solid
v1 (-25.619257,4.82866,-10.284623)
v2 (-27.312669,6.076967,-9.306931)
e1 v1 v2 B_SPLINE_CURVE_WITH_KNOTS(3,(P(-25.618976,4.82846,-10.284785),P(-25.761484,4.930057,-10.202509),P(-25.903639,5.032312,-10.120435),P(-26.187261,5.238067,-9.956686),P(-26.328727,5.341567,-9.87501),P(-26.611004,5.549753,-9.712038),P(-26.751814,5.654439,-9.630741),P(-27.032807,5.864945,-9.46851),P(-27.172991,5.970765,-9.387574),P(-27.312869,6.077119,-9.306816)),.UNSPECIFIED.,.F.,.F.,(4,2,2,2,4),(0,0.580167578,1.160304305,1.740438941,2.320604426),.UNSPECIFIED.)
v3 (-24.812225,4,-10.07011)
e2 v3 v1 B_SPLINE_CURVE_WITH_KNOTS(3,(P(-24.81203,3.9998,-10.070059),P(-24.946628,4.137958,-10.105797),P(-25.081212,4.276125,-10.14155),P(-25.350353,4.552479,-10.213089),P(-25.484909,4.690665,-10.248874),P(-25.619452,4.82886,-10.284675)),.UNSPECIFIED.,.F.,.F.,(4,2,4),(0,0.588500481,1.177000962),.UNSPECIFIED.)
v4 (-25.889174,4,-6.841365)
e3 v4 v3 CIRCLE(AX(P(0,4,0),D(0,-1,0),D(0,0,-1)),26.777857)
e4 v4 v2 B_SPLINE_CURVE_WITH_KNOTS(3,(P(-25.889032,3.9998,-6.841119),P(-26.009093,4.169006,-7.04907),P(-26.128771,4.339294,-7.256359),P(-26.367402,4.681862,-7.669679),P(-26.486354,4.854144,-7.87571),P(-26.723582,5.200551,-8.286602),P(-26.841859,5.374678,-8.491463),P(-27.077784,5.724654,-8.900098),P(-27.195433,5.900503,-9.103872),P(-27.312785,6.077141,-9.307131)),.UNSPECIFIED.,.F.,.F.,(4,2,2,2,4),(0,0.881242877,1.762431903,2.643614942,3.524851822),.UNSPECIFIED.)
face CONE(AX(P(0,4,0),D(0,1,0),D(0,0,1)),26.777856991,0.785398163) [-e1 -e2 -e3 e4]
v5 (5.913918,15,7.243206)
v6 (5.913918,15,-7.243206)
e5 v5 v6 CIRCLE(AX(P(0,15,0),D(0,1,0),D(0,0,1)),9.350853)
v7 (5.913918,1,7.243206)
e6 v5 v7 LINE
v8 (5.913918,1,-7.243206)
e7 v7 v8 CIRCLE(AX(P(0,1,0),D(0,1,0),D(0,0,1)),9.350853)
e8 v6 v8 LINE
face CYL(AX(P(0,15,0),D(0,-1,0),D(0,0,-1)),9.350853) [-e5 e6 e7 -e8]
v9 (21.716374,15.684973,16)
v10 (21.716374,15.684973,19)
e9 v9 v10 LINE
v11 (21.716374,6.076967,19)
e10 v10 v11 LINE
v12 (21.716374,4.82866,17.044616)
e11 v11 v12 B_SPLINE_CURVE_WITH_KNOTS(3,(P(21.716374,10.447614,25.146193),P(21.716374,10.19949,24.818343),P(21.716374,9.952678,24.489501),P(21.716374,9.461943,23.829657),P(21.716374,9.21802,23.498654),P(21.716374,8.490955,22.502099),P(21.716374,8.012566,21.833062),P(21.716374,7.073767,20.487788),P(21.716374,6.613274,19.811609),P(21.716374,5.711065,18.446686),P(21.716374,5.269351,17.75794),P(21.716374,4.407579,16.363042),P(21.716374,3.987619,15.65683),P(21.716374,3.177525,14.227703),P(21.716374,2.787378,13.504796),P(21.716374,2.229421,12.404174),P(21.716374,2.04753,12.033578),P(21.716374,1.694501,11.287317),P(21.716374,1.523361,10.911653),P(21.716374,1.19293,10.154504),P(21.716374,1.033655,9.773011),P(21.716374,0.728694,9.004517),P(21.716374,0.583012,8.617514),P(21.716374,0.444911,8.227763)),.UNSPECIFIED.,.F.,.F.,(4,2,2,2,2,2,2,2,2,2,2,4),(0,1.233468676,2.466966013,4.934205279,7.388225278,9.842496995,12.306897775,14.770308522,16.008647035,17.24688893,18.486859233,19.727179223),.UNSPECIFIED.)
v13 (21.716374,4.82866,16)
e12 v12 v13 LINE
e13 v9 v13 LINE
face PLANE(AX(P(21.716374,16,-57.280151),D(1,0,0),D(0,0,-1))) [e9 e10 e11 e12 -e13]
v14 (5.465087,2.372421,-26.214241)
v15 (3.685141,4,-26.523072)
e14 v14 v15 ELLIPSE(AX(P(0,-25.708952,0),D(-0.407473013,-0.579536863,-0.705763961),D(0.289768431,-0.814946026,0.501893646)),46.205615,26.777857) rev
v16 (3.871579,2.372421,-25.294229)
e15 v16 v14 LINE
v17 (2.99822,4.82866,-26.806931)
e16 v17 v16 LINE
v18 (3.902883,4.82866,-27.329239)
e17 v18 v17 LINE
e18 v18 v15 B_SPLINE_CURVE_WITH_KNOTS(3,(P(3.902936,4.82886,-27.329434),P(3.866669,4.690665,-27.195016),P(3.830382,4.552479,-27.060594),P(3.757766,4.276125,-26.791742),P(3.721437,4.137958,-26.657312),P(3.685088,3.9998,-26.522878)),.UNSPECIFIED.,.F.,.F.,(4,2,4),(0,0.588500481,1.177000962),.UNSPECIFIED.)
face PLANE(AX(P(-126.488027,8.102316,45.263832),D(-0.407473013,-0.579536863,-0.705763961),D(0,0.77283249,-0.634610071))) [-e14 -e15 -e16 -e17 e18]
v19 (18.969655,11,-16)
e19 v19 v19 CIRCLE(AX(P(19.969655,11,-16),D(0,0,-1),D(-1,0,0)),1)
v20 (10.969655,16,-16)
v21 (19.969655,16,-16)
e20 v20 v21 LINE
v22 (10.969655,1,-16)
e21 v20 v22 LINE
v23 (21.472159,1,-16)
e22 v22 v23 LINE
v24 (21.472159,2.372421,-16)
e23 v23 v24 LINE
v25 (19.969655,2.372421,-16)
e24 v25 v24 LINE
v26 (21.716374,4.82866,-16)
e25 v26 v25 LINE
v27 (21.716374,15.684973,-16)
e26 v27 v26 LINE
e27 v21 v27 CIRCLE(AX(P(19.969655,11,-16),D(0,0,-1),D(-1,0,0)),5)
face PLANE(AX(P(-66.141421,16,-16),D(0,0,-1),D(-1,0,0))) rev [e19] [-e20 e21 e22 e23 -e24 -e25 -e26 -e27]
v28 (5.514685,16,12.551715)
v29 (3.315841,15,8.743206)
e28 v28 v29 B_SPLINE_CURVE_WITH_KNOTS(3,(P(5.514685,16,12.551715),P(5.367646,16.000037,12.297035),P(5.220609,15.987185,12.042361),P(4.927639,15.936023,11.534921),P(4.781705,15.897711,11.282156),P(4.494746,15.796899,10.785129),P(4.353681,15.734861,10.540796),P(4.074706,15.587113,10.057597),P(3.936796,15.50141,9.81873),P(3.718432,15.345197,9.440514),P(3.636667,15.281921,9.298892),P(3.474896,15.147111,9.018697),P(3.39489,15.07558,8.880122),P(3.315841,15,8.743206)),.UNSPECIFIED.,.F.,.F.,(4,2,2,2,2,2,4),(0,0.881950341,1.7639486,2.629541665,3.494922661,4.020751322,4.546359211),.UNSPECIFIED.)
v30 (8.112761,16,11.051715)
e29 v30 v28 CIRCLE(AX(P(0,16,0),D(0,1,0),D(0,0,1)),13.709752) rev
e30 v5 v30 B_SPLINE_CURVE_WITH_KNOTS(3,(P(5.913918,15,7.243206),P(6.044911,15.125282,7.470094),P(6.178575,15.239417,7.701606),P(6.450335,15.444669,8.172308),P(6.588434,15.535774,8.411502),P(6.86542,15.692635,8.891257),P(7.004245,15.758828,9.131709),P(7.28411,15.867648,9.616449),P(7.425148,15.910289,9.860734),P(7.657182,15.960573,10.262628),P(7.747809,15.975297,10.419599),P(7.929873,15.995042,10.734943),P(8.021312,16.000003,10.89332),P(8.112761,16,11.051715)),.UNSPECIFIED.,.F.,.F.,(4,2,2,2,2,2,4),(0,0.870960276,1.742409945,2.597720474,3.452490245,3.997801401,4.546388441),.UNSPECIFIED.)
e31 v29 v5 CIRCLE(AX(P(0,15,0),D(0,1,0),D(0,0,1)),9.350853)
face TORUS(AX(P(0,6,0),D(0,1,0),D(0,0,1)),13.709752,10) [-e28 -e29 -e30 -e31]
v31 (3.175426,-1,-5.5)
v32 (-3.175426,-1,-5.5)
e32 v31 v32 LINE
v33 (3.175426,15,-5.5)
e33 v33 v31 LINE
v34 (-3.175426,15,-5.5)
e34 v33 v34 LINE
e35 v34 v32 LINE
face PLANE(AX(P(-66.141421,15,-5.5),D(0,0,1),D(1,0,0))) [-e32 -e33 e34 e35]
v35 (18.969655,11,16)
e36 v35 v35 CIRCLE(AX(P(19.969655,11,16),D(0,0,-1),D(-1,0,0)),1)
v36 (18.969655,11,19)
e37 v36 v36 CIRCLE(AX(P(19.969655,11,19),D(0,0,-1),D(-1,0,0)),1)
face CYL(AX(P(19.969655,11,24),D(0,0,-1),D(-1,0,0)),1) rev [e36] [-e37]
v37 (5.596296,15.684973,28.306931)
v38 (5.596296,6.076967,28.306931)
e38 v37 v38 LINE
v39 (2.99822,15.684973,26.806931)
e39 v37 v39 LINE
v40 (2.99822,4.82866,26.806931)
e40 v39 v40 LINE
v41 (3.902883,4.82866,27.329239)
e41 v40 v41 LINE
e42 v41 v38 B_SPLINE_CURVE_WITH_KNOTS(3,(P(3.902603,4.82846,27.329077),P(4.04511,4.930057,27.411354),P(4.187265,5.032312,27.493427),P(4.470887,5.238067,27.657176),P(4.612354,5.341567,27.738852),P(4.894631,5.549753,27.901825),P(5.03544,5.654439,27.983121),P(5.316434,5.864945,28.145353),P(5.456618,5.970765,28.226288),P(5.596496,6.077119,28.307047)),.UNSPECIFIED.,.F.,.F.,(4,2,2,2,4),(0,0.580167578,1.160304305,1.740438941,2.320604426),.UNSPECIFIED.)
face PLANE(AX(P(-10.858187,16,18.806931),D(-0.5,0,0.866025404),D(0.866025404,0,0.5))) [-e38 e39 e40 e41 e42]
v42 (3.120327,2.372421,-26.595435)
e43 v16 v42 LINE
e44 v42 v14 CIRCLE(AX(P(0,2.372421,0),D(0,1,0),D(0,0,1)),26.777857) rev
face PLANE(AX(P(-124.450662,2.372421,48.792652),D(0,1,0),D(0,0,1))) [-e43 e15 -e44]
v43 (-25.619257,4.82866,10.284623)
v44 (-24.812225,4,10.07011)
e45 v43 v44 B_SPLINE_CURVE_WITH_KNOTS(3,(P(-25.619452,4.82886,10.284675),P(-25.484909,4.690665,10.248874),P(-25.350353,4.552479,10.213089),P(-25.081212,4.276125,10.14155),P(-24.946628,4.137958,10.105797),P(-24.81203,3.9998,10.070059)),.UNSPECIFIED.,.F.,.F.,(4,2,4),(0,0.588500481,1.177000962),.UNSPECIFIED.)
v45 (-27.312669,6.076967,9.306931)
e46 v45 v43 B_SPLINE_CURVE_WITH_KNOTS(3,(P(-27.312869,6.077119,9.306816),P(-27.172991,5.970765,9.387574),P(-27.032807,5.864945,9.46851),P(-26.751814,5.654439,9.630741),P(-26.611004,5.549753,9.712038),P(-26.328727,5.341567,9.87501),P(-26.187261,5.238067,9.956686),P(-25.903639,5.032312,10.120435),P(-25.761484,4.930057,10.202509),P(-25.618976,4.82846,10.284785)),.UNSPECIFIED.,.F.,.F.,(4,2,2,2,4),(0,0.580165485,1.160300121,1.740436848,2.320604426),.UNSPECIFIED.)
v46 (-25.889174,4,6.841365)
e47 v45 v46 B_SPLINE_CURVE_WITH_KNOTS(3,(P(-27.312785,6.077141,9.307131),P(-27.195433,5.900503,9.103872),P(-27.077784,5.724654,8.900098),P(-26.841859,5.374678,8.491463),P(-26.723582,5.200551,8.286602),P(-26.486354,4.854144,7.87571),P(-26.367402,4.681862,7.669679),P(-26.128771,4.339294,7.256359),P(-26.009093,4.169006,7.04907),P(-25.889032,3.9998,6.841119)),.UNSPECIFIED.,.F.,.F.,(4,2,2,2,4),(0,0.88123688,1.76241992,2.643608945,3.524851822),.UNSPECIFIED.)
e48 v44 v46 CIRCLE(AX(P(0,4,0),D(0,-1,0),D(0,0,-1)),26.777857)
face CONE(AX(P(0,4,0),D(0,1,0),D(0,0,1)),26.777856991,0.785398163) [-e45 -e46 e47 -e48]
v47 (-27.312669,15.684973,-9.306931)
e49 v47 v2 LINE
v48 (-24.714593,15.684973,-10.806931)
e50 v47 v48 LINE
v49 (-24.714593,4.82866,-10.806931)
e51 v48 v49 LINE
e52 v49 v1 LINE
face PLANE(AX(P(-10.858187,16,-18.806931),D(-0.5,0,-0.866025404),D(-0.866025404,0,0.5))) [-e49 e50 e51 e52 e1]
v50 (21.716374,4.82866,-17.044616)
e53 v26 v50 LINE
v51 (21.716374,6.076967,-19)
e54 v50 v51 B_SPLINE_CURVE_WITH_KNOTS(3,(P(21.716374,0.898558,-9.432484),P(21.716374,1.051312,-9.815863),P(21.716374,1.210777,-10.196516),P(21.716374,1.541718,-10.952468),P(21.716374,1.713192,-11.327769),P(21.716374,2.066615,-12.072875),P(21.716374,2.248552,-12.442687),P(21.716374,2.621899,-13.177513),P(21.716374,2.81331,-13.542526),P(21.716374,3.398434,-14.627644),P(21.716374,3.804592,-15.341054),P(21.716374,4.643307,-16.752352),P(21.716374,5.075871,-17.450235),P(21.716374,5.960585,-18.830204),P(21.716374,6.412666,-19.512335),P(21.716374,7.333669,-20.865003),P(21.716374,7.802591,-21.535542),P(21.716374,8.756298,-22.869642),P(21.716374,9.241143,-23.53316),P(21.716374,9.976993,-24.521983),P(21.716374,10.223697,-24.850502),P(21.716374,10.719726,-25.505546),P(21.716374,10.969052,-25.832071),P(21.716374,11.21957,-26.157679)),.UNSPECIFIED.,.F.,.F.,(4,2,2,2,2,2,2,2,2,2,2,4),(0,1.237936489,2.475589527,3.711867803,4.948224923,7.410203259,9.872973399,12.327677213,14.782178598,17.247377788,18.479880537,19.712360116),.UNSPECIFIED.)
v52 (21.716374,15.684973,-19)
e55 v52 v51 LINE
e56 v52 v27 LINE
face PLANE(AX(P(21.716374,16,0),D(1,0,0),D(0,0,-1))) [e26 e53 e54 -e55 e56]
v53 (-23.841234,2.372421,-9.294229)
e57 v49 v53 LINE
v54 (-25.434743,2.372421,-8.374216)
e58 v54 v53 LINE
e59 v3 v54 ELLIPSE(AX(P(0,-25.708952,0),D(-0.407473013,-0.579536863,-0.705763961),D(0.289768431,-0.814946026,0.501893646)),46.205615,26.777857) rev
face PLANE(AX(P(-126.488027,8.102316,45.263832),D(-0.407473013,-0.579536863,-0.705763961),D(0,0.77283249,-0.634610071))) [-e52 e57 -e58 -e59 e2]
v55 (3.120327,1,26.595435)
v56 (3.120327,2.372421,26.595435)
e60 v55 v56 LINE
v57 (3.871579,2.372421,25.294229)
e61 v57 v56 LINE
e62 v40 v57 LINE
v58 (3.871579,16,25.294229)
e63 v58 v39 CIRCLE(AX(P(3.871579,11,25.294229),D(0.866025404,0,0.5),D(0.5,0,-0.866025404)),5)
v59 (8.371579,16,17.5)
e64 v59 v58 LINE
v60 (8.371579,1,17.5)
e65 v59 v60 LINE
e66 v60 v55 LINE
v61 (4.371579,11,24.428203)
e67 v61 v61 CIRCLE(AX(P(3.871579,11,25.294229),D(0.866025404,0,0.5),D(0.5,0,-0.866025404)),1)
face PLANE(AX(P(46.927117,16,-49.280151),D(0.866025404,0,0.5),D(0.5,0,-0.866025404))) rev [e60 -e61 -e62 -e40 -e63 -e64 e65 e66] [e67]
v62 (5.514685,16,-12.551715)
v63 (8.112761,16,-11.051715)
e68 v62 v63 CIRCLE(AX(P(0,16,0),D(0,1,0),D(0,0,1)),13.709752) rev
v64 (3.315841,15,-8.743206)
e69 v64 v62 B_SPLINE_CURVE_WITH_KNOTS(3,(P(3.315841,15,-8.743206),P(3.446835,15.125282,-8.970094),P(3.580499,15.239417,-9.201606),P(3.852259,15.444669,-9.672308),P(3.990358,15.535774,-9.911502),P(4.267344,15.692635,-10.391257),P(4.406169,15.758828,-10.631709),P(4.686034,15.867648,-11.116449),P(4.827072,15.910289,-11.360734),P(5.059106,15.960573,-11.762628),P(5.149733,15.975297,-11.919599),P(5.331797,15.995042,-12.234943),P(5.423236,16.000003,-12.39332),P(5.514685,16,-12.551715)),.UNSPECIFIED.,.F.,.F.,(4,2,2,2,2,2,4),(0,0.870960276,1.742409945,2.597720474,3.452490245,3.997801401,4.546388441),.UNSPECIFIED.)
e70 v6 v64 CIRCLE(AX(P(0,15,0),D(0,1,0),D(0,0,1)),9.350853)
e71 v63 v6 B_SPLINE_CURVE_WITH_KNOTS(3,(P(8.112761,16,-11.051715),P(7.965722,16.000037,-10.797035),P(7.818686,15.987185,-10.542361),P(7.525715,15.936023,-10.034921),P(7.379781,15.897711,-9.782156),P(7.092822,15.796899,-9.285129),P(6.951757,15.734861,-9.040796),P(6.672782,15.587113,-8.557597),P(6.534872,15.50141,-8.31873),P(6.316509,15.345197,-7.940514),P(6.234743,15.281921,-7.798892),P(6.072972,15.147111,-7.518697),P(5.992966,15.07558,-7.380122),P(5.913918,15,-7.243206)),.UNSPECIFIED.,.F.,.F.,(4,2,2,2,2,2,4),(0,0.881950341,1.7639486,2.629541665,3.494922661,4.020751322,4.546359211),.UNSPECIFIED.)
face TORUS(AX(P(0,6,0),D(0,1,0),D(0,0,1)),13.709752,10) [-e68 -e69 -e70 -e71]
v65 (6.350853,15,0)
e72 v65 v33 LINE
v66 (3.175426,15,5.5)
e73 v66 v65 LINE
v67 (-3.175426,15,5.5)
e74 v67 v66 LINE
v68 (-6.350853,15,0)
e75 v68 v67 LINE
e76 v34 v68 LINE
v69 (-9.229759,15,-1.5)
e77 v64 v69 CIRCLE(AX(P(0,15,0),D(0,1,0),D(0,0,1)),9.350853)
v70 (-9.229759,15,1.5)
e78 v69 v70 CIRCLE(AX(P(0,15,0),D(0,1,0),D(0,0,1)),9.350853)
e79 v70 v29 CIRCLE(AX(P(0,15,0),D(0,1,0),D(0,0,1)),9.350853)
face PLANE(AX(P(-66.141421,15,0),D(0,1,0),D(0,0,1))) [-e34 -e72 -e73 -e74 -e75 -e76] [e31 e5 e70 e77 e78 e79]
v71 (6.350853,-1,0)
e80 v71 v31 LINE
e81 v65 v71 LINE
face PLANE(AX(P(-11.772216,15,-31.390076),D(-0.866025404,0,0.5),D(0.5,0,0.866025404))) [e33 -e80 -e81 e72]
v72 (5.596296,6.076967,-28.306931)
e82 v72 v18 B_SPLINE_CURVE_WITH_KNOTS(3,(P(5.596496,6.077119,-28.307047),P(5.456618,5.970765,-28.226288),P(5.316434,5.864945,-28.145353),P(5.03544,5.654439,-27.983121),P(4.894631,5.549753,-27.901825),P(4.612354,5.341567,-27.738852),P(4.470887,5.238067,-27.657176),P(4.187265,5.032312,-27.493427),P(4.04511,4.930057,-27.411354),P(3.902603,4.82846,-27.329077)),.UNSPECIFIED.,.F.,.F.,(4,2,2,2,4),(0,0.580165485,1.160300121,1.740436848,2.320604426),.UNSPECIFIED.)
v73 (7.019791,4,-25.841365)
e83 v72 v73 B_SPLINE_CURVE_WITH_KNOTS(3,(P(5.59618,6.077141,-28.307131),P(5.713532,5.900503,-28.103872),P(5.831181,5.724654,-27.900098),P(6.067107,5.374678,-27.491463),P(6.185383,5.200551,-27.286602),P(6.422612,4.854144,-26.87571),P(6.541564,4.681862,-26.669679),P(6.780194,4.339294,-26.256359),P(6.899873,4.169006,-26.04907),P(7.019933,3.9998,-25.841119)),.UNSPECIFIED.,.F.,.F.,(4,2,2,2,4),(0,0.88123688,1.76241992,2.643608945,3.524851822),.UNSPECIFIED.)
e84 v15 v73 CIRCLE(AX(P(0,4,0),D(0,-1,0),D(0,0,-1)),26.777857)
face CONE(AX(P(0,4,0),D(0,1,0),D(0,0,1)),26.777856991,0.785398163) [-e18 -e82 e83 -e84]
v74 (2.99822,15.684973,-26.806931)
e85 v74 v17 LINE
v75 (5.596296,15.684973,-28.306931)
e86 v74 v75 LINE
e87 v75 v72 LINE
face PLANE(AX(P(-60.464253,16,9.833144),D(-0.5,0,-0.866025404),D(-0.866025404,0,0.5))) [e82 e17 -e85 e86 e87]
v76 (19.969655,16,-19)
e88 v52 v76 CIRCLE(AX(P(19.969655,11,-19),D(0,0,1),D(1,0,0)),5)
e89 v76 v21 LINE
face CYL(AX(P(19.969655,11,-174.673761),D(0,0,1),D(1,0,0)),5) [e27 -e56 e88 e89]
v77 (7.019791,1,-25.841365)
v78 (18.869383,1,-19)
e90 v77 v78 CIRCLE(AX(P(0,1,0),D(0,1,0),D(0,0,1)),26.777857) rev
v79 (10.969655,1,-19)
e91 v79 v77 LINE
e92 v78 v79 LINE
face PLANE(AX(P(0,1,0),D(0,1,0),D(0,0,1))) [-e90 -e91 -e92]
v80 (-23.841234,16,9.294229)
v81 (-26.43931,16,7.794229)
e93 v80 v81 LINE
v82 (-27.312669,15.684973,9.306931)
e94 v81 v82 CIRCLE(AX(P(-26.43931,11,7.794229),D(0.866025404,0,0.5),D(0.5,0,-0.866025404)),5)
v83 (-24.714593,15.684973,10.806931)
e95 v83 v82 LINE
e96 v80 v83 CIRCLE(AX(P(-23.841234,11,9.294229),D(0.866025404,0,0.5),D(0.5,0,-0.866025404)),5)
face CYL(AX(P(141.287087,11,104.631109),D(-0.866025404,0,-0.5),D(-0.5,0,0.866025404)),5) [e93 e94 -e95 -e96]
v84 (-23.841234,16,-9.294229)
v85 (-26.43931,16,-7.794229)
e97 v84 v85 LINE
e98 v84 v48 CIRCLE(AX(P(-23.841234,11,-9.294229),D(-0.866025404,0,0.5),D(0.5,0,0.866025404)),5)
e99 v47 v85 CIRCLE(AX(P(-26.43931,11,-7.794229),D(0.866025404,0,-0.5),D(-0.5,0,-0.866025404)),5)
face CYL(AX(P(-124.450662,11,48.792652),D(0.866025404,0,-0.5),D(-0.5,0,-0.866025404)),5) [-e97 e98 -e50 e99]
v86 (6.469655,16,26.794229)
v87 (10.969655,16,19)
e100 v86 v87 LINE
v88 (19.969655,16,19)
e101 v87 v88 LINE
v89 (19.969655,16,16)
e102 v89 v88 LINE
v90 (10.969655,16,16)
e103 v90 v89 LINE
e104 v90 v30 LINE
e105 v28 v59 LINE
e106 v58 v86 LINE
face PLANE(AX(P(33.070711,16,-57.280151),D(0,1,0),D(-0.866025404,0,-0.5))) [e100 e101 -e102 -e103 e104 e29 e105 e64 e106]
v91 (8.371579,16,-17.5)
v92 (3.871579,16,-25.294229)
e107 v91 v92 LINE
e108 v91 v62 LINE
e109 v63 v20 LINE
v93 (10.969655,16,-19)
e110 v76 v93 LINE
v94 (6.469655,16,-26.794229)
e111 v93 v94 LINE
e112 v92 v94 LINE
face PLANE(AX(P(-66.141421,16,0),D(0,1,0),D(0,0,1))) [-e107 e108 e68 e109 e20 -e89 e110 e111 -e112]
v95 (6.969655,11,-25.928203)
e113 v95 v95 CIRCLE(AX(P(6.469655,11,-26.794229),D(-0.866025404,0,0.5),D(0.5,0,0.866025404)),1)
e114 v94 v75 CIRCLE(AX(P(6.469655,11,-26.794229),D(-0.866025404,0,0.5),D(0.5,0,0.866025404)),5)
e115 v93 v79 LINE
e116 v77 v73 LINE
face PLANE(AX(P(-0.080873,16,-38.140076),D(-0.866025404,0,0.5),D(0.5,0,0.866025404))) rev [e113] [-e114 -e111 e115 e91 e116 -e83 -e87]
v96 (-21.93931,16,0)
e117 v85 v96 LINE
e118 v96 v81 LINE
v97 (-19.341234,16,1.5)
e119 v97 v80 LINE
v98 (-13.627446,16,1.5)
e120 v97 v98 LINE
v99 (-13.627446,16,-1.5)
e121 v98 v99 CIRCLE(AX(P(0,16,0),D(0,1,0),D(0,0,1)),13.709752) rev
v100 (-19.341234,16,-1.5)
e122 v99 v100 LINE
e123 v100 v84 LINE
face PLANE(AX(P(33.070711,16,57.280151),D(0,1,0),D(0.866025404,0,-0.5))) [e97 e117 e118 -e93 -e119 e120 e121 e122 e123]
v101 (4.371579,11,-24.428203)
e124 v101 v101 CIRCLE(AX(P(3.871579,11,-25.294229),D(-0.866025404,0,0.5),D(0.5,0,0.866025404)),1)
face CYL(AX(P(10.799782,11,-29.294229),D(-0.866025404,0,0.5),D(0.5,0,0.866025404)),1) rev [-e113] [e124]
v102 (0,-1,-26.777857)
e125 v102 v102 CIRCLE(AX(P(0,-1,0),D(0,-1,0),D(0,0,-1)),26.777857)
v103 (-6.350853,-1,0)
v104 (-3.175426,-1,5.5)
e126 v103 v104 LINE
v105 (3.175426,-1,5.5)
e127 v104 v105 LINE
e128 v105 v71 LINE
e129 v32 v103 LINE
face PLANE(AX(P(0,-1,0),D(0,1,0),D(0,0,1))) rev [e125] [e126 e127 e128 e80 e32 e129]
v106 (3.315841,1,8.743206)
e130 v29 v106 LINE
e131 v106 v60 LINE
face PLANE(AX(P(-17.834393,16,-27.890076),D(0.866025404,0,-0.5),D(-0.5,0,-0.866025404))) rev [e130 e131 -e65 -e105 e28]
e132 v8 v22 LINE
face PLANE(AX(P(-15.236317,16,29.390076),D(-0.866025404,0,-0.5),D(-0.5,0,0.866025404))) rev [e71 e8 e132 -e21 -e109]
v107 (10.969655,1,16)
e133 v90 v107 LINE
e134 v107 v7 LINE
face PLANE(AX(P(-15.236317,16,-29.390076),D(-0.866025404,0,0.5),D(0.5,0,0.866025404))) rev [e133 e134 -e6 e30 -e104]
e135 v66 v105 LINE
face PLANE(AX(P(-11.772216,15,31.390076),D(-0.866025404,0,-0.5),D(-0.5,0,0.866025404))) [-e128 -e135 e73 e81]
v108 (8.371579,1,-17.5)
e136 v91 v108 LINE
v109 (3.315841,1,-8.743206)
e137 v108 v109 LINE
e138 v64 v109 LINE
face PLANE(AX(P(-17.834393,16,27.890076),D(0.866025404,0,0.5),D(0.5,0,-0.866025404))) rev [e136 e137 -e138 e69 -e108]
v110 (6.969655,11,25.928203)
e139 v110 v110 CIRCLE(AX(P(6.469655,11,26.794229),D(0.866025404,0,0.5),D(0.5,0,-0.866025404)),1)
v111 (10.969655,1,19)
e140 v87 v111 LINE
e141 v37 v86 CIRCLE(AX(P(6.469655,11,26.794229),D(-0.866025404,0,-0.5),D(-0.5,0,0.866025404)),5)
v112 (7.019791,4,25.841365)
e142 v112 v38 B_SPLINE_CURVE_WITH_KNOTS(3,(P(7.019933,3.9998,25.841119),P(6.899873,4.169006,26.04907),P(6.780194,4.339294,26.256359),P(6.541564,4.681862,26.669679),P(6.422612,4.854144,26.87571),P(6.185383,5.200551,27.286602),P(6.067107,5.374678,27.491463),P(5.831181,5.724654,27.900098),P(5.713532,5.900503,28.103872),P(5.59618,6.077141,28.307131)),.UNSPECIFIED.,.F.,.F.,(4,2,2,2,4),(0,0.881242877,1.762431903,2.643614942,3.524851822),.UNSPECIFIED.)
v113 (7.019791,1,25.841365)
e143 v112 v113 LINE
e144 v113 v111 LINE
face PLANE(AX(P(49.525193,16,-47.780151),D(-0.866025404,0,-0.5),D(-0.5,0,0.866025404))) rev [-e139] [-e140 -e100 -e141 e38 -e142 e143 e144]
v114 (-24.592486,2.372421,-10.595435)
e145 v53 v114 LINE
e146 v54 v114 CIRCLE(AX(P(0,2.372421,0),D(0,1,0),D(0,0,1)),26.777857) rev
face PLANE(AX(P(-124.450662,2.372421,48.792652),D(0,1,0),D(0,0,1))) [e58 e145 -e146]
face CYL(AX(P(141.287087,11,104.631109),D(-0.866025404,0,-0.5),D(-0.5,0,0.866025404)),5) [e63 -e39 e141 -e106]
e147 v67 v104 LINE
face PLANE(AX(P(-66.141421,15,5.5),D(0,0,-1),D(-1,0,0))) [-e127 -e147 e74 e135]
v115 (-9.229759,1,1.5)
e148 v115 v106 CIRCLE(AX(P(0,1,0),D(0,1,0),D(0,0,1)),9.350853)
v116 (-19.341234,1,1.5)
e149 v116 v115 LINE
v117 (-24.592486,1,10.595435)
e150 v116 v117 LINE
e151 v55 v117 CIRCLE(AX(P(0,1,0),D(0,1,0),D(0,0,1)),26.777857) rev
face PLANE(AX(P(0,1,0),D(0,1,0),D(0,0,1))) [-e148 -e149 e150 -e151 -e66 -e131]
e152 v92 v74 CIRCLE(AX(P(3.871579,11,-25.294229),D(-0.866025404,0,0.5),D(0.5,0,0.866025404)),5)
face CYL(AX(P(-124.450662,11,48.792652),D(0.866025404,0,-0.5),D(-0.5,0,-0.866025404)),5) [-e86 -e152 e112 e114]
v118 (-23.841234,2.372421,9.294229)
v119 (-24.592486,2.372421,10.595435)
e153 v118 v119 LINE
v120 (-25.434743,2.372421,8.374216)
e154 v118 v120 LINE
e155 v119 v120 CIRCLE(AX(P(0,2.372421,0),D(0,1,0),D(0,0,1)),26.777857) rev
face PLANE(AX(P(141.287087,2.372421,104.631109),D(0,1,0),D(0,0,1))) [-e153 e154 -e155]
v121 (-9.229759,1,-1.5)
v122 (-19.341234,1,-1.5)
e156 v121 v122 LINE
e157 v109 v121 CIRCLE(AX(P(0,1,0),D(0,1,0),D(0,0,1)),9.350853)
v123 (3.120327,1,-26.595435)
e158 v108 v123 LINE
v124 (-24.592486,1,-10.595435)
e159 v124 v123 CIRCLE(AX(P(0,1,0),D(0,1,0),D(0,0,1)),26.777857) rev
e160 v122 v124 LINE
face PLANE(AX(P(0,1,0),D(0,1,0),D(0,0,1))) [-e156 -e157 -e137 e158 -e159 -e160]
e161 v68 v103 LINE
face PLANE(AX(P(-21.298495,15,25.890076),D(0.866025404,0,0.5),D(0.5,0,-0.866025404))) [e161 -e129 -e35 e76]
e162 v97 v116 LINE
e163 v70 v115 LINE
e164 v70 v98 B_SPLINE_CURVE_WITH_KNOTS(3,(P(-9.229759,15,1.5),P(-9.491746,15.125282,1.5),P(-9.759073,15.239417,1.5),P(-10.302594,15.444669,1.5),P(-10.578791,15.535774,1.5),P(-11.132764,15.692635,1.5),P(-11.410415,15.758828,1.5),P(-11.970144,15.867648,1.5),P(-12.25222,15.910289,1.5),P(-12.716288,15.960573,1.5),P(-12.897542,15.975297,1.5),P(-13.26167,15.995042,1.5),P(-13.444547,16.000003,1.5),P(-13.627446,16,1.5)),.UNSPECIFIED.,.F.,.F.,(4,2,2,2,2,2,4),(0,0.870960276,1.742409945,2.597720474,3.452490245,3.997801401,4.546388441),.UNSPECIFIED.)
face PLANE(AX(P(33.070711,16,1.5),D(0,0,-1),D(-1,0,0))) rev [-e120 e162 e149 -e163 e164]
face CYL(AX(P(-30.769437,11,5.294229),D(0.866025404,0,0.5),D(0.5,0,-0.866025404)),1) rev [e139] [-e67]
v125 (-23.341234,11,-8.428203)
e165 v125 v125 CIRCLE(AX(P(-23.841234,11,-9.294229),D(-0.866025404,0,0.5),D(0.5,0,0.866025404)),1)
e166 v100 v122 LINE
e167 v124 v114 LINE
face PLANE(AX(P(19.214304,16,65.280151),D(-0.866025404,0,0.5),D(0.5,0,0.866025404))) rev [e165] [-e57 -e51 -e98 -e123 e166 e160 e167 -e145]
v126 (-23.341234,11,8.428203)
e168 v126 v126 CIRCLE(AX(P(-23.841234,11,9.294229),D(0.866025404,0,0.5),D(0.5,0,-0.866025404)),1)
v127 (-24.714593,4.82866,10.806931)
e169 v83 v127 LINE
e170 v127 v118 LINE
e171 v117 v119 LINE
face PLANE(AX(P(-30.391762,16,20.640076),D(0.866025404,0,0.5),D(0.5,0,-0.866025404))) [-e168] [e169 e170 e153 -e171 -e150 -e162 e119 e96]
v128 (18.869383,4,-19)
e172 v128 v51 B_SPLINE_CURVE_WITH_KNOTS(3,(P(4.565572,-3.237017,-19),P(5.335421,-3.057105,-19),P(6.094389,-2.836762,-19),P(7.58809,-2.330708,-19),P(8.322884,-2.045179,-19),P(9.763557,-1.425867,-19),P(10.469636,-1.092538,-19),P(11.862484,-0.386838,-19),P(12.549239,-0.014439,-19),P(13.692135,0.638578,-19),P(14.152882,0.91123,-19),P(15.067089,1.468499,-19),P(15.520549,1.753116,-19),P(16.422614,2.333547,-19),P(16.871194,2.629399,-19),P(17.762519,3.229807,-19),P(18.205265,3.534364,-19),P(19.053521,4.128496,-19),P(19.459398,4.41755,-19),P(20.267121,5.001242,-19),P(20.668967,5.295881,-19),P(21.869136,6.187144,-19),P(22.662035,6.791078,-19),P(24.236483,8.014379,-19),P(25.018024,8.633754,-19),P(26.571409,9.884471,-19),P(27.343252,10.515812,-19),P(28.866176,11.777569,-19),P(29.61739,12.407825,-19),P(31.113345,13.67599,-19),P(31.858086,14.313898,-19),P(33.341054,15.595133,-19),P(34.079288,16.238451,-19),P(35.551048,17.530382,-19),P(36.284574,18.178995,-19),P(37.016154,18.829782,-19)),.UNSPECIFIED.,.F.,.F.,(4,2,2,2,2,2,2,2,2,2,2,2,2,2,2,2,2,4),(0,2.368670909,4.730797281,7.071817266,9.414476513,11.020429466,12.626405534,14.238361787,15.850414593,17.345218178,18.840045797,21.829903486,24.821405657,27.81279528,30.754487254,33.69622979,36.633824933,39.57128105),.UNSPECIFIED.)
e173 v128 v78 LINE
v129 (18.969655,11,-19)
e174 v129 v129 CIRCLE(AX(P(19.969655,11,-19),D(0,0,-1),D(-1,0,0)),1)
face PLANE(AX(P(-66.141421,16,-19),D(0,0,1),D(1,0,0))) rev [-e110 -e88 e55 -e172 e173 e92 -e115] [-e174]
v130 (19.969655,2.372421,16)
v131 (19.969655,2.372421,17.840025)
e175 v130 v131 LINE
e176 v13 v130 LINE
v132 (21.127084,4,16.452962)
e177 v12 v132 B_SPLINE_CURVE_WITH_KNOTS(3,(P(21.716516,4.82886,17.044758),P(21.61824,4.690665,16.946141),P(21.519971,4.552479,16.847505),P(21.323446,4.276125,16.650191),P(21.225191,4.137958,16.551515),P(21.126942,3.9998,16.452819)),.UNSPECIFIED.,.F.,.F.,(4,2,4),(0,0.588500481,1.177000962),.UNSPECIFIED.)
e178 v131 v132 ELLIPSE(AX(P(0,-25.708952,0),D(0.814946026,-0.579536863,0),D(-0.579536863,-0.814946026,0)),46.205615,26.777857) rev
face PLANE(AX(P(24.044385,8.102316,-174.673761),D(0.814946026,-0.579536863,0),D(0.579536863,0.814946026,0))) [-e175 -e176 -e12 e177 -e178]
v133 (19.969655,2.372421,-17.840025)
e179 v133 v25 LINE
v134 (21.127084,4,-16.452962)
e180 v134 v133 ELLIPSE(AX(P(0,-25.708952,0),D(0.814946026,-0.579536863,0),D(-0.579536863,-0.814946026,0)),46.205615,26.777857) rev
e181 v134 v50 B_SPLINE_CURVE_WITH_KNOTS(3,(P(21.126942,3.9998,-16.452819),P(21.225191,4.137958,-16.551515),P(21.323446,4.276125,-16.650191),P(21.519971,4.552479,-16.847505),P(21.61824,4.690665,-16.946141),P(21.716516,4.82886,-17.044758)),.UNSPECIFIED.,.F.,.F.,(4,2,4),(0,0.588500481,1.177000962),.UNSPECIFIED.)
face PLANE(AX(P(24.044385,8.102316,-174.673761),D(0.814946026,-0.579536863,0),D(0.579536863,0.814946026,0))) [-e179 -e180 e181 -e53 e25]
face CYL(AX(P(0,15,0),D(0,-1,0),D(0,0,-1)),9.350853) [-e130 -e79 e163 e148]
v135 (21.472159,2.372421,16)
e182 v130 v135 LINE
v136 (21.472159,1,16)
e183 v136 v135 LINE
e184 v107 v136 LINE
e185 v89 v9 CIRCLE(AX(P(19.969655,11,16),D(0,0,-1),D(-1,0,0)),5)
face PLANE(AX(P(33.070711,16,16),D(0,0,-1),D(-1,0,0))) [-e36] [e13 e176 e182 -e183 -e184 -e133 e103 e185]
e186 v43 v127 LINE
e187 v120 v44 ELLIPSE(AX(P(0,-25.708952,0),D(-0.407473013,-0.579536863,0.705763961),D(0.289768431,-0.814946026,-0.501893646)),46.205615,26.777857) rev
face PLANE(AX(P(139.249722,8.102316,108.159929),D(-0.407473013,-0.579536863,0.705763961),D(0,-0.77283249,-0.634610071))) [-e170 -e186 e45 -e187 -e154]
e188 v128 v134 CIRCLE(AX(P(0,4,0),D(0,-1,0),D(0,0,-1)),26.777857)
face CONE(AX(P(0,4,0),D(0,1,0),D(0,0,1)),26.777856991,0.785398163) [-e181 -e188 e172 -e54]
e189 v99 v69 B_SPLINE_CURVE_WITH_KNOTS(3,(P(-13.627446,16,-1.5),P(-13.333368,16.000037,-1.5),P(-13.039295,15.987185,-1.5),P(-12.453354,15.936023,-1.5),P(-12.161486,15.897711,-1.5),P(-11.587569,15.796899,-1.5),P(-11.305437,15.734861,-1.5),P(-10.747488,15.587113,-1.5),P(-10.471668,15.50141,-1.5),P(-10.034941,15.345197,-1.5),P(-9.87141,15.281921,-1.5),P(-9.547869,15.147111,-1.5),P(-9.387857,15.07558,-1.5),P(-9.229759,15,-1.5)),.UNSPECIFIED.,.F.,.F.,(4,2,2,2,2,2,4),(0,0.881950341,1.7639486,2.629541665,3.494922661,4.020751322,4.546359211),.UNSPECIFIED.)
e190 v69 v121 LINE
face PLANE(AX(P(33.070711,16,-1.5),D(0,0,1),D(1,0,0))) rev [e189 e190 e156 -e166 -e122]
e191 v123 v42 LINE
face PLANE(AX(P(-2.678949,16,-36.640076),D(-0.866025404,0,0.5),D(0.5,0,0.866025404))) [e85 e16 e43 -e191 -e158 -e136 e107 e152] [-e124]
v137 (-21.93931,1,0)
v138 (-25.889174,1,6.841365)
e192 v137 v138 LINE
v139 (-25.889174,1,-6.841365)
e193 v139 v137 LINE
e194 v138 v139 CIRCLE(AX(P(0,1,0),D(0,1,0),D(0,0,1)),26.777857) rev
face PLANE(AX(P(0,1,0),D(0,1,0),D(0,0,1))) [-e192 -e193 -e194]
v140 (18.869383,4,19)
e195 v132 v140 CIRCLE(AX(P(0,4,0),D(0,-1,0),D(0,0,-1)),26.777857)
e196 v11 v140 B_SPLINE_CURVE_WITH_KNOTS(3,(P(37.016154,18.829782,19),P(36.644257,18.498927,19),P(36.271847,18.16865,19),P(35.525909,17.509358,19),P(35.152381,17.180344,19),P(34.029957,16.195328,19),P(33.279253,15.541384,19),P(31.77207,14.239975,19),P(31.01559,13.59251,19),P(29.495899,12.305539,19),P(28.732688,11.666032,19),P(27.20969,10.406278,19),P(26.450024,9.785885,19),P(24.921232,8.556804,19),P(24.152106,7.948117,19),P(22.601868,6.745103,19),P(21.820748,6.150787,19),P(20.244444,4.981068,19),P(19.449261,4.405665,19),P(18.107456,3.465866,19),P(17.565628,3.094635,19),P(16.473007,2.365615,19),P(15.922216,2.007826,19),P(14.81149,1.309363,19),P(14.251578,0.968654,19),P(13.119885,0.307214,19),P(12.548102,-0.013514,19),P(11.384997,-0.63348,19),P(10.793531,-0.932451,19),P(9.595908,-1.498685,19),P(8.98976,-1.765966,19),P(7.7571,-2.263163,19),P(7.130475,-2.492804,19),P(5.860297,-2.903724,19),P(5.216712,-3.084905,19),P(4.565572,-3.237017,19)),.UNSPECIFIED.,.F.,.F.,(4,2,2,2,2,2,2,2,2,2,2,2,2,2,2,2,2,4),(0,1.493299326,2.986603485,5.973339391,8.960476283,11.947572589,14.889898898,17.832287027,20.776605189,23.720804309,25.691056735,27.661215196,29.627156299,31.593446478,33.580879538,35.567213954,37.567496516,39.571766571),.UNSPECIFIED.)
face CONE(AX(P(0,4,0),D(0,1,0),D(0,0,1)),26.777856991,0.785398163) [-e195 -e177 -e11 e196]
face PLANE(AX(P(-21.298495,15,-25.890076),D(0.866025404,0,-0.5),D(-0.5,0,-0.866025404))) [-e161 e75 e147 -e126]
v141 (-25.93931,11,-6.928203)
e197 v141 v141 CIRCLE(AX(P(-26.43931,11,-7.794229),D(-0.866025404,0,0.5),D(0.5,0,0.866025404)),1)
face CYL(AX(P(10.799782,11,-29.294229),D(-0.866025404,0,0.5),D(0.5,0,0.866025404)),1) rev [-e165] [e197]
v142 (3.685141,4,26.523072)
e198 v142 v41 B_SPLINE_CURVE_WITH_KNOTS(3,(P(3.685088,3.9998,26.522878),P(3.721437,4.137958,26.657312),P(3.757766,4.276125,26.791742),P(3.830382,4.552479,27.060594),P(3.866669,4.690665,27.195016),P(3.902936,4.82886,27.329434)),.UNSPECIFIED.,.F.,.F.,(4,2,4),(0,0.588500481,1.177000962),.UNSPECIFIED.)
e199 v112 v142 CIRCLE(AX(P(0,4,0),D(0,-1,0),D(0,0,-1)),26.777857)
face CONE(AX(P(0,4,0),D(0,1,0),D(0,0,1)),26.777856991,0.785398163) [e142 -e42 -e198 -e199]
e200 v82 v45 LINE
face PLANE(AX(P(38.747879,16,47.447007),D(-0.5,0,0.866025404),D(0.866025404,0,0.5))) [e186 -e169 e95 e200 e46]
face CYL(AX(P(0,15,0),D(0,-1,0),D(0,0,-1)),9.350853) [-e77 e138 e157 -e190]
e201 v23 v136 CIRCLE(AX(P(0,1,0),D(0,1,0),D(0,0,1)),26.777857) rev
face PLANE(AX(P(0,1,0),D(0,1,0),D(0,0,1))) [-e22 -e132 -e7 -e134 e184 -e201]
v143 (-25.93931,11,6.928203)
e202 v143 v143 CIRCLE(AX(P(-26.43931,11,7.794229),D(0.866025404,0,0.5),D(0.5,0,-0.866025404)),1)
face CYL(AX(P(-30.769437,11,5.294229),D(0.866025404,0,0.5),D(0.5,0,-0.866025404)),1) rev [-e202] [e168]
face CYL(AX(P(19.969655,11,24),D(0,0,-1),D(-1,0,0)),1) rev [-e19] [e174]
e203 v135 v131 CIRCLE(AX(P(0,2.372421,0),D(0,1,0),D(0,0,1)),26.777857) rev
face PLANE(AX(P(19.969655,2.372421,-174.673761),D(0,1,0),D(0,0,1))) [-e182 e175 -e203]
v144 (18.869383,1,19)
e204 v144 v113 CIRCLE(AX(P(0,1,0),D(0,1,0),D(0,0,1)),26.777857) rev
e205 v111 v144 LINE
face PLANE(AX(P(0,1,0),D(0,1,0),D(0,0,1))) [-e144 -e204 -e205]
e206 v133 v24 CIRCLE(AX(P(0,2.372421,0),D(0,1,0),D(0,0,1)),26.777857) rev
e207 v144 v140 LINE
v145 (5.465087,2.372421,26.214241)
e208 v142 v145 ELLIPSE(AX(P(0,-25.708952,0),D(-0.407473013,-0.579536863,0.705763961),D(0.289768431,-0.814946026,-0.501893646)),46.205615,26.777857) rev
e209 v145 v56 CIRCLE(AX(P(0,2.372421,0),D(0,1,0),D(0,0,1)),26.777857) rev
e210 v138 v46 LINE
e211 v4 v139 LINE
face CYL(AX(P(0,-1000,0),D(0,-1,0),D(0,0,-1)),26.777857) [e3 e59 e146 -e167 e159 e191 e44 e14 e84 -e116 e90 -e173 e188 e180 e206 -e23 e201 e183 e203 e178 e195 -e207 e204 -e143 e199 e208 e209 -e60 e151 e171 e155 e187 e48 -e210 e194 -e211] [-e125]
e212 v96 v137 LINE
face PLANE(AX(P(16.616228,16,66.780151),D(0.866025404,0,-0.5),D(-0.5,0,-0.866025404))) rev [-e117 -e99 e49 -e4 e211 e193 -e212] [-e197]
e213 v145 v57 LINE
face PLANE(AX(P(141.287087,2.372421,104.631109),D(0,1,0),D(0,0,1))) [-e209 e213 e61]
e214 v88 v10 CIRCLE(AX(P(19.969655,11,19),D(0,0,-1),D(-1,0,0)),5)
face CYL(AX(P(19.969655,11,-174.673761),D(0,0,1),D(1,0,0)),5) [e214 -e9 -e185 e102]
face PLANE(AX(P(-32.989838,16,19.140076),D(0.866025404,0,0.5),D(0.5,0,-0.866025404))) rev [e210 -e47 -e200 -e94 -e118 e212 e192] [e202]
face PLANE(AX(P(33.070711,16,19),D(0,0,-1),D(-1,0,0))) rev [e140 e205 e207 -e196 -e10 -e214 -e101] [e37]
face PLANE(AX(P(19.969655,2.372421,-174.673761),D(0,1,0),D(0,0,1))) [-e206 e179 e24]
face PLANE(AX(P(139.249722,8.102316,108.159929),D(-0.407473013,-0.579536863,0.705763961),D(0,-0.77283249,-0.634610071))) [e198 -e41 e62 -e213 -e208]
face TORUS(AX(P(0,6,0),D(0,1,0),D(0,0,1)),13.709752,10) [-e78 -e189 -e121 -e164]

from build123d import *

# Parameters (mm, degrees)
BOSS_EXTRUDE1_DEPTH      = 1
BOSS_EXTRUDE1_DEPTH_BACK = 1
SKETCH2_R                = 30
SKETCH1_R                = 9.350852961
BOSS_EXTRUDE2_DEPTH      = 14
BOSS_EXTRUDE3_DEPTH      = 15
CIRPATTERN1_COUNT        = 3
CUT_EXTRUDE2_DEPTH       = 64.041803276
SKETCH4_R                = 1
CUT_EXTRUDE3_DEPTH       = 43
CIRPATTERN2_COUNT        = 3
CUT_EXTRUDE4_DEPTH       = 43
FILLET1_R                = 10


with BuildPart() as part:
    # Sketch2 → Boss-Extrude1 (new, two sides: drawn at the far end of the back side and taken through both)
    with BuildSketch(Plane(origin=(0, 0, 0), x_dir=(1, 0, 0), z_dir=(0, 1, 0)).offset(-BOSS_EXTRUDE1_DEPTH_BACK)):
        with Locations(Location((0, 0, 0), (0, 0, 270))):
            Circle(SKETCH2_R)
    extrude(amount=BOSS_EXTRUDE1_DEPTH + BOSS_EXTRUDE1_DEPTH_BACK)

    # Sketch1 → Boss-Extrude2 (add)
    with BuildSketch(Plane(origin=(0, 1, 0), x_dir=(1, 0, 0), z_dir=(0, 1, 0))):
        with Locations(Location((0, 0, 0), (0, 0, 90))):
            Circle(SKETCH1_R)
        Polygon((3.175426481, -5.5), (6.350852961, 0), (3.175426481, 5.5), (-3.175426481, 5.5), (-6.350852961, 0), (-3.175426481, -5.5), align=None, mode=Mode.SUBTRACT)
    extrude(amount=BOSS_EXTRUDE2_DEPTH)

    # Sketch1<3> → Boss-Extrude3 (add)
    with BuildSketch(Plane(origin=(0, 1, 0), x_dir=(1, 0, 0), z_dir=(0, 1, 0))):
        with BuildLine():
            Line((2.998219694, 26.806931157), (8.371578903, 17.5))
            Line((8.371578903, 17.5), (3.315841392, 8.74320576))
            ThreePointArc((3.315841392, 8.74320576), (4.675426481, 8.098076211), (5.913917603, 7.24320576))
            Line((5.913917603, 7.24320576), (10.969655115, 16))
            Line((10.969655115, 16), (21.716373532, 16))
            Line((21.716373532, 16), (21.716373532, 19))
            Line((21.716373532, 19), (10.969655115, 19))
            Line((10.969655115, 19), (5.596295906, 28.306931157))
            Line((5.596295906, 28.306931157), (2.998219694, 26.806931157))
        make_face()
    boss_extrude3 = extrude(amount=BOSS_EXTRUDE3_DEPTH)

    # CirPattern1: Boss-Extrude3 ×3 about axis
    cirpattern1_axis = Axis((0, 0, 0), (0, 1, 0))
    for i in range(1, CIRPATTERN1_COUNT):
        add(boss_extrude3.rotate(cirpattern1_axis, i * 360 / CIRPATTERN1_COUNT))

    # Sketch3 → Cut-Extrude2 (cut, symmetric)
    with BuildSketch(Plane(origin=(-16.454482672, 0, 9.5), x_dir=(0.5000000000000041, 0, 0.8660254037844364), z_dir=(-0.8660254037844363, 0, 0.500000000000004))):
        Polygon((-19.969655115, 2.372421116), (-21.716373532, 4.828660441), (-21.716373532, 2.372421116), align=None)
        with BuildLine():
            Line((-21.716373532, 16), (-21.716373532, 15.684973294))
            ThreePointArc((-21.716373532, 15.684973294), (-20.857104699, 15.920613096), (-19.969655115, 16))
            Line((-19.969655115, 16), (-21.716373532, 16))
        make_face()
    cut_extrude2 = extrude(amount=CUT_EXTRUDE2_DEPTH, both=True, mode=Mode.SUBTRACT)

    # Sketch4 → Cut-Extrude3 (cut)
    with BuildSketch(Plane(origin=(-16.454482672, 0, 9.5), x_dir=(0.500000000000004, 0, 0.8660254037844364), z_dir=(-0.8660254037844365, 0, 0.500000000000004))):
        with Locations((-19.969655115, 11)):
            Circle(SKETCH4_R)
    cut_extrude3 = extrude(amount=-CUT_EXTRUDE3_DEPTH, mode=Mode.SUBTRACT)

    # CirPattern2: Cut-Extrude2, Cut-Extrude3 ×3 about axis
    cirpattern2_axis = Axis((0, 1, 0), (0, 1, 0))
    add([cut_extrude2.rotate(cirpattern2_axis, i * 360 / CIRPATTERN2_COUNT) for i in range(1, CIRPATTERN2_COUNT)], mode=Mode.SUBTRACT)
    add([cut_extrude3.rotate(cirpattern2_axis, i * 360 / CIRPATTERN2_COUNT) for i in range(1, CIRPATTERN2_COUNT)], mode=Mode.SUBTRACT)

    # Sketch5 → Cut-Revolve2 (revolve, cut)
    with BuildSketch(Plane(origin=(0, 0, 0), x_dir=(0, 0, -1), z_dir=(1, 0, 0)), mode=Mode.PRIVATE) as cut_revolve2_sk:
        Polygon((-26.777856991, 4), (-31.777856991, 9), (-31.777856991, -1), (-26.777856991, -1), align=None)
    revolve(cut_revolve2_sk.sketch.rotate(Axis((0, -1000, 0), (0, 1, 0)), 180), axis=Axis((0, -1000, 0), (0, 1, 0)), mode=Mode.SUBTRACT)

    # Sketch1<4> → Cut-Extrude4 (cut)
    with BuildSketch(Plane(origin=(0, 1, 0), x_dir=(1, 0, 0), z_dir=(0, 1, 0))):
        Polygon((-3.175426481, -5.5), (3.175426481, -5.5), (6.350852961, 0), (3.175426481, 5.5), (-3.175426481, 5.5), (-6.350852961, 0), align=None)
    extrude(amount=-CUT_EXTRUDE4_DEPTH, mode=Mode.SUBTRACT)

    # Fillet1
    # the kernel refuses this fillet: 10 mm, written as the material it takes off along each edge
    with BuildSketch(Plane(origin=(0, 16, 0), x_dir=(0.9612469799967569, 0, -0.27568867123462737), z_dir=(-0.27568867123462737, 0, -0.9612469799967569))) as fillet1_piece_1:
        with BuildLine():
            CenterArc((13.709751905, 10), FILLET1_R, 244.158067237, 25.841932763)
            Line((9.350852961, 1), (9.263674982, 0.82))
            ThreePointArc((9.263674982, 0.82), (9.150852961, 0.5), (9.150852961, 0))
            Line((9.150852961, 0), (9.350852961, -0.2))
            Line((9.350852961, -0.2), (13.709751905, -0.2))
            Line((13.709751905, -0.2), (13.709751905, 0))
        make_face()
    revolve(axis=Axis((0, 16, 0), (0, -1, 0)), revolution_arc=152.006117334, mode=Mode.SUBTRACT)
    with BuildSketch(Plane(origin=(0, 16, 0), x_dir=(-0.24187009717361344, 0, 0.9703086396055776), z_dir=(0.9703086396055776, 0, 0.24187009717361344))) as fillet1_piece_2:
        with BuildLine():
            CenterArc((13.709751905, 10), FILLET1_R, 244.158067237, 25.841932763)
            Line((9.350852961, 1), (9.263674982, 0.82))
            ThreePointArc((9.263674982, 0.82), (9.150852961, 0.5), (9.150852961, 0))
            Line((9.150852961, 0), (9.350852961, -0.2))
            Line((9.350852961, -0.2), (13.709751905, -0.2))
            Line((13.709751905, -0.2), (13.709751905, 0))
        make_face()
    revolve(axis=Axis((0, 16, 0), (0, -1, 0)), revolution_arc=152.006117334, mode=Mode.SUBTRACT)
    with BuildSketch(Plane(origin=(0, 16, 0), x_dir=(-0.7193768828231427, 0, -0.6946199683709492), z_dir=(-0.6946199683709492, 0, 0.7193768828231427))) as fillet1_piece_3:
        with BuildLine():
            CenterArc((13.709751905, 10), FILLET1_R, 244.158067237, 25.841932763)
            Line((13.709751905, 0), (13.709751905, -0.2))
            Line((13.709751905, -0.2), (9.350852961, -0.2))
            Line((9.350852961, -0.2), (9.150852961, 0))
            ThreePointArc((9.150852961, 0), (9.150852961, 0.5), (9.263674982, 0.82))
            Line((9.263674982, 0.82), (9.350852961, 1))
        make_face()
    revolve(axis=Axis((0, 16, 0), (0, -1, 0)), revolution_arc=152.006117334, mode=Mode.SUBTRACT)


solid = part.part
